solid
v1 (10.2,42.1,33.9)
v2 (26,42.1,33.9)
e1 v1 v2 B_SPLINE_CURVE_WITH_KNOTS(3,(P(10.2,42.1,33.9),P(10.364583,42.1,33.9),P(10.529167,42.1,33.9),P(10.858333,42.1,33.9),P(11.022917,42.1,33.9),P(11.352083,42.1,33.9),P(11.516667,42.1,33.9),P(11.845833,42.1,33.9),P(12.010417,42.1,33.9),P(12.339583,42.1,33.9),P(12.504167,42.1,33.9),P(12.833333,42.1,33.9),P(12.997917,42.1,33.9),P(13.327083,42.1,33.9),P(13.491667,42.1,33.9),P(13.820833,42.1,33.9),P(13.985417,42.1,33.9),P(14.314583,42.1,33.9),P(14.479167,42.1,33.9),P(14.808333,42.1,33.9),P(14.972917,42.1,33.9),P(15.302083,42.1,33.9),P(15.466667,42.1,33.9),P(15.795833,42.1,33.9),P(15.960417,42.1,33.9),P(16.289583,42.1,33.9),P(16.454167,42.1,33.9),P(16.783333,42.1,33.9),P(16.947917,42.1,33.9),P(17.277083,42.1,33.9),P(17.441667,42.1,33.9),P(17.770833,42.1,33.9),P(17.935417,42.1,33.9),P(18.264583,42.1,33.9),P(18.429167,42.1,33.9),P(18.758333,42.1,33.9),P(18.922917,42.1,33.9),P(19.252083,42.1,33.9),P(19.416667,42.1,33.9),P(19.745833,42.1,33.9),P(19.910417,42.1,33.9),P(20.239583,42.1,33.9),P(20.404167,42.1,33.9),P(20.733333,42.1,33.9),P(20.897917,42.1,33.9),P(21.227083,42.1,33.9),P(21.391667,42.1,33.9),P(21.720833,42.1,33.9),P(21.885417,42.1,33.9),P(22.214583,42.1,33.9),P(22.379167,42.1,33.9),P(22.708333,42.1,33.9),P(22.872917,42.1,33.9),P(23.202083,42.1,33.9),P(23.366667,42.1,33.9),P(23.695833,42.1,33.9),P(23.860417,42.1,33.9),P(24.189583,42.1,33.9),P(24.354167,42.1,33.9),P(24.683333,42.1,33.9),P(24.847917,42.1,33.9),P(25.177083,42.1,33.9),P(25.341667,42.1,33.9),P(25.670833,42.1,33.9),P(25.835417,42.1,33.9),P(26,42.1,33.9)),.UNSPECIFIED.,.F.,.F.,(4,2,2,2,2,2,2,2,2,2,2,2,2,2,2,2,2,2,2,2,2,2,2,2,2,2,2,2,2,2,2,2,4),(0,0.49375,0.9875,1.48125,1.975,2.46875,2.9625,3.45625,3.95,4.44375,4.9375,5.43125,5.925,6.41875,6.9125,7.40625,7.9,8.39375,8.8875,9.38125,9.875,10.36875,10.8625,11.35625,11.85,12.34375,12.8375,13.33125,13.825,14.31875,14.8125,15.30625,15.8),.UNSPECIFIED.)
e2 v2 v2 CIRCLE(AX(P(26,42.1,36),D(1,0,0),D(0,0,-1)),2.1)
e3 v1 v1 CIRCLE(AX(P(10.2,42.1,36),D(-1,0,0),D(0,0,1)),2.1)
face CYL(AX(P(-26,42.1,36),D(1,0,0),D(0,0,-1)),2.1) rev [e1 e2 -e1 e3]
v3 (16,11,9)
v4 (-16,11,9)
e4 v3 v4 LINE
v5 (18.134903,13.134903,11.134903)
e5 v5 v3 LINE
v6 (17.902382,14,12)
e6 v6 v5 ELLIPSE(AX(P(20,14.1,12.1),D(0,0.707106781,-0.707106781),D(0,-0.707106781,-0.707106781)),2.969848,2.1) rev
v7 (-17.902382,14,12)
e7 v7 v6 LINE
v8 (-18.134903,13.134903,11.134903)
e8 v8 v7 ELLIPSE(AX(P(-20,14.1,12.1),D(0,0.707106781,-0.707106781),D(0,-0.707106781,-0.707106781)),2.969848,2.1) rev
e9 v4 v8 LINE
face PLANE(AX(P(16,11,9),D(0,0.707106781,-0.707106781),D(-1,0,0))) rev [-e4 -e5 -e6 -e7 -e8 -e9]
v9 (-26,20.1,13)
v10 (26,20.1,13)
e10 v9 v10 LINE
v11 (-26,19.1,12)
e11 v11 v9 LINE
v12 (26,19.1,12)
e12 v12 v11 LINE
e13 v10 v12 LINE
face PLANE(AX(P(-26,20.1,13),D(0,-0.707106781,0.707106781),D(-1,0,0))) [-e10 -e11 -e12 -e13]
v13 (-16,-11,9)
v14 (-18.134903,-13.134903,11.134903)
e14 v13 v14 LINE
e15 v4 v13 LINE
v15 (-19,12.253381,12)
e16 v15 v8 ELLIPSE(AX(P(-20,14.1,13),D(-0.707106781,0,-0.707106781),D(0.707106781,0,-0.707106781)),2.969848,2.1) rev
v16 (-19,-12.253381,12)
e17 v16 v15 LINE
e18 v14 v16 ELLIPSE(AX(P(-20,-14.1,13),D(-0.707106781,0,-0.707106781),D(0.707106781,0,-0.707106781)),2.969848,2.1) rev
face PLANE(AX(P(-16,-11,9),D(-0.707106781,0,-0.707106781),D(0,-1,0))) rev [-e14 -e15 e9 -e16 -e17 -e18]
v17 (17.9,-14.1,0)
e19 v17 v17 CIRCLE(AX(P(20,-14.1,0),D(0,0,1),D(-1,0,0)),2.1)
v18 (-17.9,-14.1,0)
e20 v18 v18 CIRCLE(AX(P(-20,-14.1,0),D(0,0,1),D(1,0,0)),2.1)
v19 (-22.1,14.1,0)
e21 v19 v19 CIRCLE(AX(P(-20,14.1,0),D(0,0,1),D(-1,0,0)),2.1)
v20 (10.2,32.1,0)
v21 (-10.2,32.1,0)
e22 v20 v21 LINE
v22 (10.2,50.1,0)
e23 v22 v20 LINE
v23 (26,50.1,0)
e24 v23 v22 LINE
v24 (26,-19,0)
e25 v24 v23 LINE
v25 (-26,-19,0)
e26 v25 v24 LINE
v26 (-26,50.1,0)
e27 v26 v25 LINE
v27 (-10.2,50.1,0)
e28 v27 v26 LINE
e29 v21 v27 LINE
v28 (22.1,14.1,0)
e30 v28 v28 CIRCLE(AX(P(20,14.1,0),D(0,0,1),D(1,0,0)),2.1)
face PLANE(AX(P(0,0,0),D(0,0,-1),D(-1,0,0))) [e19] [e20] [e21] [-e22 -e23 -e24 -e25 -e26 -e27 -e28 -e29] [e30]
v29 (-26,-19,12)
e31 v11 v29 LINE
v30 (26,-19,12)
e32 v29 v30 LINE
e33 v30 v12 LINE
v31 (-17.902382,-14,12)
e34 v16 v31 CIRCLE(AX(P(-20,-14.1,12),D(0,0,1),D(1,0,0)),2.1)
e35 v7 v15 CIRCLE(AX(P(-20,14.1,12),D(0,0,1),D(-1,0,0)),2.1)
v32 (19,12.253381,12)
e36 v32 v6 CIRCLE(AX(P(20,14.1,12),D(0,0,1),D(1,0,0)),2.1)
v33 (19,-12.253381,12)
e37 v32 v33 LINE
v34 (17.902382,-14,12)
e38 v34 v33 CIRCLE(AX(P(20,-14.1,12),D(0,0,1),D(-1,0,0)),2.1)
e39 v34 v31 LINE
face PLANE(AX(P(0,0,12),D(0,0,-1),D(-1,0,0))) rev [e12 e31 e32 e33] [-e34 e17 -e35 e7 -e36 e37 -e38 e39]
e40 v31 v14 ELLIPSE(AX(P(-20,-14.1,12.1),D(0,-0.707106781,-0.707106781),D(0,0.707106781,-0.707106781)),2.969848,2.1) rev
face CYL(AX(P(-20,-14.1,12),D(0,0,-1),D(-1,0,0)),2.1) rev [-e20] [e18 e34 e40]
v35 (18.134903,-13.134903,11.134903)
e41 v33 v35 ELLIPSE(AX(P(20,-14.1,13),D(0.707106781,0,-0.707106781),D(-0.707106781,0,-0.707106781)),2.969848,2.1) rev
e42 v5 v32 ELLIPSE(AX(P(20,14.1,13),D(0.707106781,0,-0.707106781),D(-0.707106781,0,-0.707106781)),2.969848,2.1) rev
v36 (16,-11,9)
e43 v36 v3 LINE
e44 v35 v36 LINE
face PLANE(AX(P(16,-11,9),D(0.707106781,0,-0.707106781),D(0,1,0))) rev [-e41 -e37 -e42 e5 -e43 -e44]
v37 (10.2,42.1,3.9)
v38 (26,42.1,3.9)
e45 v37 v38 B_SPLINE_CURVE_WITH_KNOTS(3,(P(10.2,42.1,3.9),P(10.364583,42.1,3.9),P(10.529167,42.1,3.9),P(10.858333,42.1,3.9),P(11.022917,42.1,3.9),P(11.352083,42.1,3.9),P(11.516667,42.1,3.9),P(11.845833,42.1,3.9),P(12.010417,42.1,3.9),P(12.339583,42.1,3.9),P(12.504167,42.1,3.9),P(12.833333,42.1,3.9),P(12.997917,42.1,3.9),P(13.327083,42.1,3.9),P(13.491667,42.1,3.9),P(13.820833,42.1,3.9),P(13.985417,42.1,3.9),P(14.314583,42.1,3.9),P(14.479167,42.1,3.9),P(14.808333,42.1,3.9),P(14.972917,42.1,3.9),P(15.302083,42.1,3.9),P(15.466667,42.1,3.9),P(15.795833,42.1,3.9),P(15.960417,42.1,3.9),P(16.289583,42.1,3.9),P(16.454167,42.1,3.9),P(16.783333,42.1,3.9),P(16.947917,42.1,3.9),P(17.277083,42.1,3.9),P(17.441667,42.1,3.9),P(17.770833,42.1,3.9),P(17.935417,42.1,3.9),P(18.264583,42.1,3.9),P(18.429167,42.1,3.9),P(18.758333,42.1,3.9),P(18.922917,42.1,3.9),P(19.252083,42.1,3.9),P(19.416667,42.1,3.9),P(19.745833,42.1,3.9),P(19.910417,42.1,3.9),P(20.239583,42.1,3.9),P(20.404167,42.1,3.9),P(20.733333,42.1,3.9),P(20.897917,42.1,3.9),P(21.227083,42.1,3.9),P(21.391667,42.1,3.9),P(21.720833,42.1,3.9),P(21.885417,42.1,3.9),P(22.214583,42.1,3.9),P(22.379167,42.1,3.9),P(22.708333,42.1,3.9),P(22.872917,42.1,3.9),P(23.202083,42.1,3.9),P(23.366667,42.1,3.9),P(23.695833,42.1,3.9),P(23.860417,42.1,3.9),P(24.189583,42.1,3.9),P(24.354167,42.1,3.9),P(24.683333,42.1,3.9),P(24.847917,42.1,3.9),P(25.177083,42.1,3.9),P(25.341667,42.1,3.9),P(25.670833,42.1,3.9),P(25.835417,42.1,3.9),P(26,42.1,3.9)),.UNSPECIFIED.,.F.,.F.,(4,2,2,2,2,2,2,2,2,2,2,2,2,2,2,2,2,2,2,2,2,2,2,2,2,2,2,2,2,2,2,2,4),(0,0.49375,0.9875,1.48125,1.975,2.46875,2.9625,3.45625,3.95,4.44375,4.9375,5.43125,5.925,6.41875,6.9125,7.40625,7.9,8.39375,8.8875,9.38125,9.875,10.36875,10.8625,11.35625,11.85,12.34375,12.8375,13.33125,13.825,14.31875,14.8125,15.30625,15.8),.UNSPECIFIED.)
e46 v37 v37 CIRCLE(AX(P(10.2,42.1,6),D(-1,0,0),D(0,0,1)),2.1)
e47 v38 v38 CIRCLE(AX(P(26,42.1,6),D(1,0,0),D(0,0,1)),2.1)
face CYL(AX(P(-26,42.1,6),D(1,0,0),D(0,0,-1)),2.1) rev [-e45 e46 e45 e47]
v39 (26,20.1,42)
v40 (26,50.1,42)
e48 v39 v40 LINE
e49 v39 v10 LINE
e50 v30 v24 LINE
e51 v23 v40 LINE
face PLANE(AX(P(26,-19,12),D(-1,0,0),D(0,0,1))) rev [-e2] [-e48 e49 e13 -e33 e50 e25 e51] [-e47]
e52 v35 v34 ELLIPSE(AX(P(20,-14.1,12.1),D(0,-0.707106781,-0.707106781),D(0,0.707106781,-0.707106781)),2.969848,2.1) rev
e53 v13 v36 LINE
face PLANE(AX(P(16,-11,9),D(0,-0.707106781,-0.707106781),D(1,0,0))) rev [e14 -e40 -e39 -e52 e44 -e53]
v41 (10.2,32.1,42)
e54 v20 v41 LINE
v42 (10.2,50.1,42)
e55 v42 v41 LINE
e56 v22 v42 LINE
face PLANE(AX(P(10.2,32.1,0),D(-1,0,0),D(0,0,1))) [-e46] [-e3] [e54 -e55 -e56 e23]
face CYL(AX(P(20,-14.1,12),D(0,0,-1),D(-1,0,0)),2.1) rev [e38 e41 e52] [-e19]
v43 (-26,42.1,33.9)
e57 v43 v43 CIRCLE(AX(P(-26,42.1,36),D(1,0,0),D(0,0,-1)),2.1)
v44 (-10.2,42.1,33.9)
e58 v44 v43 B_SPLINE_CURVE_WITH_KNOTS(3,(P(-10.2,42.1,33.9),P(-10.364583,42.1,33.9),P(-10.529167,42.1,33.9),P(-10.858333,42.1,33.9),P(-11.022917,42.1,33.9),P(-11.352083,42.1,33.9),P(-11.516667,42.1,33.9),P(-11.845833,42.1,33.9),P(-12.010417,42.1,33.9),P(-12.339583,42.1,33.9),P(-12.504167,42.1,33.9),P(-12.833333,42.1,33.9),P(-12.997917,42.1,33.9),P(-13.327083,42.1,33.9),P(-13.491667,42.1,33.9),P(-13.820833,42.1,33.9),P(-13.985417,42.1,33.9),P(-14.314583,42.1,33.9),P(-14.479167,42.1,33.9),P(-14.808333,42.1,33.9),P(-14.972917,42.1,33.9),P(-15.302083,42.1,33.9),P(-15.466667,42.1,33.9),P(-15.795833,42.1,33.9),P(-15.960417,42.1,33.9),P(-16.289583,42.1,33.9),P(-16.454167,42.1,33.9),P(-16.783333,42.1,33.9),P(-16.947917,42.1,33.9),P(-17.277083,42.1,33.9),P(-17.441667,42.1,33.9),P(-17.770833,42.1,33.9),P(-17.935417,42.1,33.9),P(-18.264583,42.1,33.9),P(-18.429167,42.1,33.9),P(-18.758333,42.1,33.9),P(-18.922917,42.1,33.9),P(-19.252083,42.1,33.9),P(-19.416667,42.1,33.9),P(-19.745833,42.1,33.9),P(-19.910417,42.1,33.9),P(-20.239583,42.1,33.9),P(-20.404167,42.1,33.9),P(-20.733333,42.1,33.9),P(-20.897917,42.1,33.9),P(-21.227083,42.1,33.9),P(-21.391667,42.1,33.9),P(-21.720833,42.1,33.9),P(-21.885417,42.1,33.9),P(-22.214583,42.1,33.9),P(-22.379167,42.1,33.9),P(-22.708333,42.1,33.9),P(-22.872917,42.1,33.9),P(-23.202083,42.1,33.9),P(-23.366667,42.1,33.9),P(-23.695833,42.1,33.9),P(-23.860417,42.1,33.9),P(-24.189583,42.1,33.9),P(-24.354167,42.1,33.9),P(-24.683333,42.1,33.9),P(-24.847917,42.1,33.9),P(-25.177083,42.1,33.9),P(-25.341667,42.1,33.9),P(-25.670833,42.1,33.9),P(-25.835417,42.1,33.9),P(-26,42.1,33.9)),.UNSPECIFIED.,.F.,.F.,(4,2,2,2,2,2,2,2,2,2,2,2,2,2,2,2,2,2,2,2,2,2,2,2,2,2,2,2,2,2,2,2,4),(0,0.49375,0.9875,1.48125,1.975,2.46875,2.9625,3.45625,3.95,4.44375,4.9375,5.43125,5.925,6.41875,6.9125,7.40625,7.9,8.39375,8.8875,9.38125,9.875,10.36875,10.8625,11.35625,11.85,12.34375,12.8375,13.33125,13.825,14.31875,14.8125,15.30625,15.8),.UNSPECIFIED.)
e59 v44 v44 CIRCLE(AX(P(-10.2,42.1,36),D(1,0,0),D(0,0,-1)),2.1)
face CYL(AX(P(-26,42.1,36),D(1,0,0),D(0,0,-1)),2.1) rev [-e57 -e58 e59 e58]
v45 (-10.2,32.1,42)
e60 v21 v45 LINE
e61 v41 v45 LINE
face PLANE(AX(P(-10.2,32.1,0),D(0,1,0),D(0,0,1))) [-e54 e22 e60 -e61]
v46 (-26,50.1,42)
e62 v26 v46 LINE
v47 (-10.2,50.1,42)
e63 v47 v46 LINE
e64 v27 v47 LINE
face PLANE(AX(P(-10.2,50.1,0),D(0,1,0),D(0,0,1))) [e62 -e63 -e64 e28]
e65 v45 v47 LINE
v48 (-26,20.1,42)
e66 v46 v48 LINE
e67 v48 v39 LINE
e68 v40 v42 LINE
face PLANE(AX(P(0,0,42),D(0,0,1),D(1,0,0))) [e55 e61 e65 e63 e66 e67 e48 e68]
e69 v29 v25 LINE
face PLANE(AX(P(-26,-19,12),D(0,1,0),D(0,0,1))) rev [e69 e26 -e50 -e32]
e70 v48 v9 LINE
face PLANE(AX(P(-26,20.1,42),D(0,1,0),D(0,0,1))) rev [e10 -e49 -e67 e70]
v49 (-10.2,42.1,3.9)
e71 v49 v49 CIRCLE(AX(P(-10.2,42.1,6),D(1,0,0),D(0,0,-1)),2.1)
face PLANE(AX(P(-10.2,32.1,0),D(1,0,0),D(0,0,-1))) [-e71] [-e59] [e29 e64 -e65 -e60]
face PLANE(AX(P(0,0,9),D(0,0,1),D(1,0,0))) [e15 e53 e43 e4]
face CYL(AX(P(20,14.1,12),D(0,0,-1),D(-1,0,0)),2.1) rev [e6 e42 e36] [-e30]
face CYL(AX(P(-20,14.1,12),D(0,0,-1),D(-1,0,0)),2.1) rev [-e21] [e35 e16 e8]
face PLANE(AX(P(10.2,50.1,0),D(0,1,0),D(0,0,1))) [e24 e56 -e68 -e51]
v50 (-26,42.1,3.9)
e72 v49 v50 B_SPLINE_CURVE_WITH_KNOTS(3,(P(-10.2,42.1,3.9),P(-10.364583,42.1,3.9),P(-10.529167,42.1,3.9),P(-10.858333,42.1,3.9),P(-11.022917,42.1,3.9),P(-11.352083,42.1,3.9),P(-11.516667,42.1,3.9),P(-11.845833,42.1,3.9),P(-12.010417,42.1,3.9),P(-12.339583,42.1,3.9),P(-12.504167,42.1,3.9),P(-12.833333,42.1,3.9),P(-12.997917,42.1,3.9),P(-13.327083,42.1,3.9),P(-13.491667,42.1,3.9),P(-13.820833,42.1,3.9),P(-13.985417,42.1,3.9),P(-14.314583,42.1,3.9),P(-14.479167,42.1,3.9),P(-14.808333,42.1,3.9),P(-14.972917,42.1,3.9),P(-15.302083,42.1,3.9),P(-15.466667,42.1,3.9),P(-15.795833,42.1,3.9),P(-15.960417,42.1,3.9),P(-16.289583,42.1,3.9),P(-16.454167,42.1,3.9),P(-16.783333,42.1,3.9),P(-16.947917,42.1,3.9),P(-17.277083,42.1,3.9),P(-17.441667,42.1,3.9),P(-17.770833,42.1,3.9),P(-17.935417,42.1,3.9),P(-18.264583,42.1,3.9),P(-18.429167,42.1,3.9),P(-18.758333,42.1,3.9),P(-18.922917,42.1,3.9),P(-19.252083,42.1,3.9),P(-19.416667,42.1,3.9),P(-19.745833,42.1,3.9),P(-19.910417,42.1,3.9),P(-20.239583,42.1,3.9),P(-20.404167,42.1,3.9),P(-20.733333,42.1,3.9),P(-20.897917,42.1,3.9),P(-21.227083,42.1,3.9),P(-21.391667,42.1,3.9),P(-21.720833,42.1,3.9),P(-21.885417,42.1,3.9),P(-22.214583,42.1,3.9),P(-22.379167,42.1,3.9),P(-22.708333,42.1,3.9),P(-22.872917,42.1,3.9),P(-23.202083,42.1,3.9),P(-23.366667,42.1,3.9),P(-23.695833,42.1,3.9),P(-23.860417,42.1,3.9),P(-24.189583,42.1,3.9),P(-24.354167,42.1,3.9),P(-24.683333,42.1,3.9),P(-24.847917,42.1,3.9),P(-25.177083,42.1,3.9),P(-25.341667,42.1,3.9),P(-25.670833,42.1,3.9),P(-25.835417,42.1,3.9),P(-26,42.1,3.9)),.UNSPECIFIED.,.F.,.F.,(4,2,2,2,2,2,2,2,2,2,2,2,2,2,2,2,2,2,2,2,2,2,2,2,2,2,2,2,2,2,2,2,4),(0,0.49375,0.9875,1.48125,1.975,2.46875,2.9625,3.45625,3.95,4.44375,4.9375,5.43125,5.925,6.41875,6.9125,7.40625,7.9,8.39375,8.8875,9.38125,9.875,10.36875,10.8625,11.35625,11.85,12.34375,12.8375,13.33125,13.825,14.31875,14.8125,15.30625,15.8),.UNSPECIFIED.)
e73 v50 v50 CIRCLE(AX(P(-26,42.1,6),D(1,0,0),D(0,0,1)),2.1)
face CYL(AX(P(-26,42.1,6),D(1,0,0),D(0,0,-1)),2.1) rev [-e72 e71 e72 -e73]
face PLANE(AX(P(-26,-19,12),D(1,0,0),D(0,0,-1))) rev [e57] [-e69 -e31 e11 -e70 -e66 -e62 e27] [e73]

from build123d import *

# Parameters (mm, degrees)
SZKIC1_W                    = 52
SZKIC1_H                    = 38
SZKIC1_R                    = 2.1
DODANIE_WYCI_GNI_CIE1_DEPTH = 12
SZKIC2_W                    = 32
SZKIC2_H                    = 22
WYTNIJ_WYCI_GNI_CIE1_DEPTH  = 3
SFAZOWANIE1_SIZE            = 3
DODANIE_WYCI_GNI_CIE2_DEPTH = 12
DODANIE_WYCI_GNI_CIE3_DEPTH = 30
SFAZOWANIE2_SIZE            = 1
SZKIC6_R                    = 2.1
WYTNIJ_WYCI_GNI_CIE2_DEPTH  = 84.534483897


with BuildPart() as part:
    # Szkic1 → Dodanie-wyciągnięcie1 (new body)
    with BuildSketch(Plane.XY):
        Rectangle(SZKIC1_W, SZKIC1_H)
        with Locations((20, 14.1)):
            Circle(SZKIC1_R, mode=Mode.SUBTRACT)
        with Locations(Location((20, -14.1, 0), (0, 0, 180))):
            Circle(SZKIC1_R, mode=Mode.SUBTRACT)
        with Locations((-20, -14.1)):
            Circle(SZKIC1_R, mode=Mode.SUBTRACT)
        with Locations(Location((-20, 14.1, 0), (0, 0, 180))):
            Circle(SZKIC1_R, mode=Mode.SUBTRACT)
    extrude(amount=DODANIE_WYCI_GNI_CIE1_DEPTH)

    # Szkic2 → Wytnij-wyciągnięcie1 (cut)
    with BuildSketch(Plane.XY.offset(12)):
        Rectangle(SZKIC2_W, SZKIC2_H)
    extrude(amount=-WYTNIJ_WYCI_GNI_CIE1_DEPTH, mode=Mode.SUBTRACT)

    # Sfazowanie1
    # the kernel refuses this chamfer: 3 mm, written as the material it takes off along each edge
    with BuildSketch(Plane(origin=(16, -11, 12), x_dir=(0, -0.9996219169112969, 0.02749587661058621), z_dir=(-1, 0, 0))) as sfazowanie1_piece_1_section:
        Polygon((SFAZOWANIE1_SIZE * 0.999621916911, -SFAZOWANIE1_SIZE * 0.0274958766106), (-SFAZOWANIE1_SIZE * 0.0274958766106, -SFAZOWANIE1_SIZE * 0.999621916911), (0, 0), align=None)
    sfazowanie1_piece_1 = extrude(amount=32, mode=Mode.PRIVATE)
    sfazowanie1_piece_1 = split(sfazowanie1_piece_1, bisect_by=Plane(origin=(0, -11.991212463, 9), z_dir=(0, 0, 1)), keep=Keep.TOP, mode=Mode.PRIVATE)
    add(sfazowanie1_piece_1, mode=Mode.SUBTRACT)
    with BuildSketch(Plane(origin=(16, 11, 12), x_dir=(0.9996219169112968, 0, 0.02749587661058619), z_dir=(0, -1, 0))) as sfazowanie1_piece_2_section:
        Polygon((SFAZOWANIE1_SIZE * 0.999621916911, -SFAZOWANIE1_SIZE * 0.0274958766106), (-SFAZOWANIE1_SIZE * 0.0274958766106, -SFAZOWANIE1_SIZE * 0.999621916911), (0, 0), align=None)
    sfazowanie1_piece_2 = extrude(amount=22, mode=Mode.PRIVATE)
    sfazowanie1_piece_2 = split(sfazowanie1_piece_2, bisect_by=Plane(origin=(16.991212463, 0, 9), z_dir=(0, 0, 1)), keep=Keep.TOP, mode=Mode.PRIVATE)
    add(sfazowanie1_piece_2, mode=Mode.SUBTRACT)
    with BuildSketch(Plane(origin=(-16, -11, 12), x_dir=(-0.9996219169112968, 0, 0.02749587661058619), z_dir=(0, 1, 0))) as sfazowanie1_piece_3_section:
        Polygon((SFAZOWANIE1_SIZE * 0.999621916911, -SFAZOWANIE1_SIZE * 0.0274958766106), (-SFAZOWANIE1_SIZE * 0.0274958766106, -SFAZOWANIE1_SIZE * 0.999621916911), (0, 0), align=None)
    sfazowanie1_piece_3 = extrude(amount=22, mode=Mode.PRIVATE)
    sfazowanie1_piece_3 = split(sfazowanie1_piece_3, bisect_by=Plane(origin=(-16.991212463, 0, 9), z_dir=(0, 0, 1)), keep=Keep.TOP, mode=Mode.PRIVATE)
    add(sfazowanie1_piece_3, mode=Mode.SUBTRACT)
    with BuildSketch(Plane(origin=(-16, 11, 12), x_dir=(0, 0.9996219169112969, 0.02749587661058621), z_dir=(1, 0, 0))) as sfazowanie1_piece_4_section:
        Polygon((SFAZOWANIE1_SIZE * 0.999621916911, -SFAZOWANIE1_SIZE * 0.0274958766106), (-SFAZOWANIE1_SIZE * 0.0274958766106, -SFAZOWANIE1_SIZE * 0.999621916911), (0, 0), align=None)
    sfazowanie1_piece_4 = extrude(amount=32, mode=Mode.PRIVATE)
    sfazowanie1_piece_4 = split(sfazowanie1_piece_4, bisect_by=Plane(origin=(0, 11.991212463, 9), z_dir=(0, 0, 1)), keep=Keep.TOP, mode=Mode.PRIVATE)
    add(sfazowanie1_piece_4, mode=Mode.SUBTRACT)
    with BuildSketch(Plane(origin=(16, 11, 12), x_dir=(0.9996219169112968, 0, 0.02749587661058619), z_dir=(0, -1, 0))) as sfazowanie1_piece_5a_section:
        Polygon((SFAZOWANIE1_SIZE * 0.999621916911, -SFAZOWANIE1_SIZE * 0.0274958766106), (-SFAZOWANIE1_SIZE * 0.0274958766106, -SFAZOWANIE1_SIZE * 0.999621916911), (0, 0), align=None)
    sfazowanie1_piece_5a = extrude(amount=29.715048964, mode=Mode.PRIVATE)
    sfazowanie1_piece_5a = split(sfazowanie1_piece_5a, bisect_by=Plane(origin=(16.991212463, -11, 11.014096999), z_dir=(0, -1, 0)), keep=Keep.TOP, mode=Mode.PRIVATE)
    sfazowanie1_piece_5a = split(sfazowanie1_piece_5a, bisect_by=Plane(origin=(16.991212463, -14.857524482, 9), z_dir=(0, 0, 1)), keep=Keep.TOP, mode=Mode.PRIVATE)
    with BuildSketch(Plane(origin=(23.715048964, -11, 12), x_dir=(0, -0.9996219169112969, 0.02749587661058621), z_dir=(-1, 0, 0))) as sfazowanie1_piece_5b_section:
        Polygon((SFAZOWANIE1_SIZE * 0.999621916911, -SFAZOWANIE1_SIZE * 0.0274958766106), (-SFAZOWANIE1_SIZE * 0.0274958766106, -SFAZOWANIE1_SIZE * 0.999621916911), (0, 0), align=None)
    sfazowanie1_piece_5b = extrude(amount=39.715048964, mode=Mode.PRIVATE)
    sfazowanie1_piece_5b = split(sfazowanie1_piece_5b, bisect_by=Plane(origin=(16, -11.991212463, 11.014096999), z_dir=(1, 0, 0)), keep=Keep.TOP, mode=Mode.PRIVATE)
    sfazowanie1_piece_5b = split(sfazowanie1_piece_5b, bisect_by=Plane(origin=(19.857524482, -11.991212463, 9), z_dir=(0, 0, 1)), keep=Keep.TOP, mode=Mode.PRIVATE)
    sfazowanie1_piece_5 = sfazowanie1_piece_5a & sfazowanie1_piece_5b
    add(sfazowanie1_piece_5, mode=Mode.SUBTRACT)
    with BuildSketch(Plane(origin=(-16, -18.715048964, 12), x_dir=(-0.9996219169112968, 0, 0.02749587661058619), z_dir=(0, 1, 0))) as sfazowanie1_piece_6a_section:
        Polygon((SFAZOWANIE1_SIZE * 0.999621916911, -SFAZOWANIE1_SIZE * 0.0274958766106), (-SFAZOWANIE1_SIZE * 0.0274958766106, -SFAZOWANIE1_SIZE * 0.999621916911), (0, 0), align=None)
    sfazowanie1_piece_6a = extrude(amount=29.715048964, mode=Mode.PRIVATE)
    sfazowanie1_piece_6a = split(sfazowanie1_piece_6a, bisect_by=Plane(origin=(-16.991212463, -11, 11.014096999), z_dir=(0, -1, 0)), keep=Keep.TOP, mode=Mode.PRIVATE)
    sfazowanie1_piece_6a = split(sfazowanie1_piece_6a, bisect_by=Plane(origin=(-16.991212463, -14.857524482, 9), z_dir=(0, 0, 1)), keep=Keep.TOP, mode=Mode.PRIVATE)
    with BuildSketch(Plane(origin=(16, -11, 12), x_dir=(0, -0.9996219169112969, 0.02749587661058621), z_dir=(-1, 0, 0))) as sfazowanie1_piece_6b_section:
        Polygon((SFAZOWANIE1_SIZE * 0.999621916911, -SFAZOWANIE1_SIZE * 0.0274958766106), (-SFAZOWANIE1_SIZE * 0.0274958766106, -SFAZOWANIE1_SIZE * 0.999621916911), (0, 0), align=None)
    sfazowanie1_piece_6b = extrude(amount=39.715048964, mode=Mode.PRIVATE)
    sfazowanie1_piece_6b = split(sfazowanie1_piece_6b, bisect_by=Plane(origin=(-16, -11.991212463, 11.014096999), z_dir=(-1, 0, 0)), keep=Keep.TOP, mode=Mode.PRIVATE)
    sfazowanie1_piece_6b = split(sfazowanie1_piece_6b, bisect_by=Plane(origin=(-19.857524482, -11.991212463, 9), z_dir=(0, 0, 1)), keep=Keep.TOP, mode=Mode.PRIVATE)
    sfazowanie1_piece_6 = sfazowanie1_piece_6a & sfazowanie1_piece_6b
    add(sfazowanie1_piece_6, mode=Mode.SUBTRACT)
    with BuildSketch(Plane(origin=(16, 18.715048964, 12), x_dir=(0.9996219169112968, 0, 0.02749587661058619), z_dir=(0, -1, 0))) as sfazowanie1_piece_7a_section:
        Polygon((SFAZOWANIE1_SIZE * 0.999621916911, -SFAZOWANIE1_SIZE * 0.0274958766106), (-SFAZOWANIE1_SIZE * 0.0274958766106, -SFAZOWANIE1_SIZE * 0.999621916911), (0, 0), align=None)
    sfazowanie1_piece_7a = extrude(amount=29.715048964, mode=Mode.PRIVATE)
    sfazowanie1_piece_7a = split(sfazowanie1_piece_7a, bisect_by=Plane(origin=(16.991212463, 11, 11.014096999), z_dir=(0, 1, 0)), keep=Keep.TOP, mode=Mode.PRIVATE)
    sfazowanie1_piece_7a = split(sfazowanie1_piece_7a, bisect_by=Plane(origin=(16.991212463, 14.857524482, 9), z_dir=(0, 0, 1)), keep=Keep.TOP, mode=Mode.PRIVATE)
    with BuildSketch(Plane(origin=(-16, 11, 12), x_dir=(0, 0.9996219169112969, 0.02749587661058621), z_dir=(1, 0, 0))) as sfazowanie1_piece_7b_section:
        Polygon((SFAZOWANIE1_SIZE * 0.999621916911, -SFAZOWANIE1_SIZE * 0.0274958766106), (-SFAZOWANIE1_SIZE * 0.0274958766106, -SFAZOWANIE1_SIZE * 0.999621916911), (0, 0), align=None)
    sfazowanie1_piece_7b = extrude(amount=39.715048964, mode=Mode.PRIVATE)
    sfazowanie1_piece_7b = split(sfazowanie1_piece_7b, bisect_by=Plane(origin=(16, 11.991212463, 11.014096999), z_dir=(1, 0, 0)), keep=Keep.TOP, mode=Mode.PRIVATE)
    sfazowanie1_piece_7b = split(sfazowanie1_piece_7b, bisect_by=Plane(origin=(19.857524482, 11.991212463, 9), z_dir=(0, 0, 1)), keep=Keep.TOP, mode=Mode.PRIVATE)
    sfazowanie1_piece_7 = sfazowanie1_piece_7a & sfazowanie1_piece_7b
    add(sfazowanie1_piece_7, mode=Mode.SUBTRACT)
    with BuildSketch(Plane(origin=(-23.715048964, 11, 12), x_dir=(0, 0.9996219169112969, 0.02749587661058621), z_dir=(1, 0, 0))) as sfazowanie1_piece_8a_section:
        Polygon((SFAZOWANIE1_SIZE * 0.999621916911, -SFAZOWANIE1_SIZE * 0.0274958766106), (-SFAZOWANIE1_SIZE * 0.0274958766106, -SFAZOWANIE1_SIZE * 0.999621916911), (0, 0), align=None)
    sfazowanie1_piece_8a = extrude(amount=39.715048964, mode=Mode.PRIVATE)
    sfazowanie1_piece_8a = split(sfazowanie1_piece_8a, bisect_by=Plane(origin=(-16, 11.991212463, 11.014096999), z_dir=(-1, 0, 0)), keep=Keep.TOP, mode=Mode.PRIVATE)
    sfazowanie1_piece_8a = split(sfazowanie1_piece_8a, bisect_by=Plane(origin=(-19.857524482, 11.991212463, 9), z_dir=(0, 0, 1)), keep=Keep.TOP, mode=Mode.PRIVATE)
    with BuildSketch(Plane(origin=(-16, -11, 12), x_dir=(-0.9996219169112968, 0, 0.02749587661058619), z_dir=(0, 1, 0))) as sfazowanie1_piece_8b_section:
        Polygon((SFAZOWANIE1_SIZE * 0.999621916911, -SFAZOWANIE1_SIZE * 0.0274958766106), (-SFAZOWANIE1_SIZE * 0.0274958766106, -SFAZOWANIE1_SIZE * 0.999621916911), (0, 0), align=None)
    sfazowanie1_piece_8b = extrude(amount=29.715048964, mode=Mode.PRIVATE)
    sfazowanie1_piece_8b = split(sfazowanie1_piece_8b, bisect_by=Plane(origin=(-16.991212463, 11, 11.014096999), z_dir=(0, 1, 0)), keep=Keep.TOP, mode=Mode.PRIVATE)
    sfazowanie1_piece_8b = split(sfazowanie1_piece_8b, bisect_by=Plane(origin=(-16.991212463, 14.857524482, 9), z_dir=(0, 0, 1)), keep=Keep.TOP, mode=Mode.PRIVATE)
    sfazowanie1_piece_8 = sfazowanie1_piece_8a & sfazowanie1_piece_8b
    add(sfazowanie1_piece_8, mode=Mode.SUBTRACT)

    # Szkic3 → Dodanie-wyciągnięcie2 (add)
    with BuildSketch(Plane.XY.offset(12)):
        Polygon((-10.2, 32.1), (10.2, 32.1), (10.2, 50.1), (26, 50.1), (26, 19), (-26, 19), (-26, 50.1), (-10.2, 50.1), align=None)
    extrude(amount=-DODANIE_WYCI_GNI_CIE2_DEPTH)

    # Szkic4 → Dodanie-wyciągnięcie3 (add)
    with BuildSketch(Plane.XY.offset(12)):
        Polygon((-26, 20.1), (26, 20.1), (26, 50.1), (10.2, 50.1), (10.2, 32.1), (-10.2, 32.1), (-10.2, 50.1), (-26, 50.1), align=None)
    extrude(amount=DODANIE_WYCI_GNI_CIE3_DEPTH)

    # Sfazowanie2
    sfazowanie2_edges = [part.edges().sort_by_distance(p)[0] for p in [
        (0, 20.1, 12),
    ]]
    chamfer(sfazowanie2_edges, length=SFAZOWANIE2_SIZE)

    # Szkic6 → Wytnij-wyciągnięcie2 (cut, through all)
    with BuildSketch(Plane(origin=(26, 0, 0), x_dir=(0, 0, -1), z_dir=(1, 0, 0))):
        with Locations((-36, 42.1)):
            Circle(SZKIC6_R)
        with Locations((-6, 42.1)):
            Circle(SZKIC6_R)
    extrude(amount=-WYTNIJ_WYCI_GNI_CIE2_DEPTH, mode=Mode.SUBTRACT)


solid = part.part
